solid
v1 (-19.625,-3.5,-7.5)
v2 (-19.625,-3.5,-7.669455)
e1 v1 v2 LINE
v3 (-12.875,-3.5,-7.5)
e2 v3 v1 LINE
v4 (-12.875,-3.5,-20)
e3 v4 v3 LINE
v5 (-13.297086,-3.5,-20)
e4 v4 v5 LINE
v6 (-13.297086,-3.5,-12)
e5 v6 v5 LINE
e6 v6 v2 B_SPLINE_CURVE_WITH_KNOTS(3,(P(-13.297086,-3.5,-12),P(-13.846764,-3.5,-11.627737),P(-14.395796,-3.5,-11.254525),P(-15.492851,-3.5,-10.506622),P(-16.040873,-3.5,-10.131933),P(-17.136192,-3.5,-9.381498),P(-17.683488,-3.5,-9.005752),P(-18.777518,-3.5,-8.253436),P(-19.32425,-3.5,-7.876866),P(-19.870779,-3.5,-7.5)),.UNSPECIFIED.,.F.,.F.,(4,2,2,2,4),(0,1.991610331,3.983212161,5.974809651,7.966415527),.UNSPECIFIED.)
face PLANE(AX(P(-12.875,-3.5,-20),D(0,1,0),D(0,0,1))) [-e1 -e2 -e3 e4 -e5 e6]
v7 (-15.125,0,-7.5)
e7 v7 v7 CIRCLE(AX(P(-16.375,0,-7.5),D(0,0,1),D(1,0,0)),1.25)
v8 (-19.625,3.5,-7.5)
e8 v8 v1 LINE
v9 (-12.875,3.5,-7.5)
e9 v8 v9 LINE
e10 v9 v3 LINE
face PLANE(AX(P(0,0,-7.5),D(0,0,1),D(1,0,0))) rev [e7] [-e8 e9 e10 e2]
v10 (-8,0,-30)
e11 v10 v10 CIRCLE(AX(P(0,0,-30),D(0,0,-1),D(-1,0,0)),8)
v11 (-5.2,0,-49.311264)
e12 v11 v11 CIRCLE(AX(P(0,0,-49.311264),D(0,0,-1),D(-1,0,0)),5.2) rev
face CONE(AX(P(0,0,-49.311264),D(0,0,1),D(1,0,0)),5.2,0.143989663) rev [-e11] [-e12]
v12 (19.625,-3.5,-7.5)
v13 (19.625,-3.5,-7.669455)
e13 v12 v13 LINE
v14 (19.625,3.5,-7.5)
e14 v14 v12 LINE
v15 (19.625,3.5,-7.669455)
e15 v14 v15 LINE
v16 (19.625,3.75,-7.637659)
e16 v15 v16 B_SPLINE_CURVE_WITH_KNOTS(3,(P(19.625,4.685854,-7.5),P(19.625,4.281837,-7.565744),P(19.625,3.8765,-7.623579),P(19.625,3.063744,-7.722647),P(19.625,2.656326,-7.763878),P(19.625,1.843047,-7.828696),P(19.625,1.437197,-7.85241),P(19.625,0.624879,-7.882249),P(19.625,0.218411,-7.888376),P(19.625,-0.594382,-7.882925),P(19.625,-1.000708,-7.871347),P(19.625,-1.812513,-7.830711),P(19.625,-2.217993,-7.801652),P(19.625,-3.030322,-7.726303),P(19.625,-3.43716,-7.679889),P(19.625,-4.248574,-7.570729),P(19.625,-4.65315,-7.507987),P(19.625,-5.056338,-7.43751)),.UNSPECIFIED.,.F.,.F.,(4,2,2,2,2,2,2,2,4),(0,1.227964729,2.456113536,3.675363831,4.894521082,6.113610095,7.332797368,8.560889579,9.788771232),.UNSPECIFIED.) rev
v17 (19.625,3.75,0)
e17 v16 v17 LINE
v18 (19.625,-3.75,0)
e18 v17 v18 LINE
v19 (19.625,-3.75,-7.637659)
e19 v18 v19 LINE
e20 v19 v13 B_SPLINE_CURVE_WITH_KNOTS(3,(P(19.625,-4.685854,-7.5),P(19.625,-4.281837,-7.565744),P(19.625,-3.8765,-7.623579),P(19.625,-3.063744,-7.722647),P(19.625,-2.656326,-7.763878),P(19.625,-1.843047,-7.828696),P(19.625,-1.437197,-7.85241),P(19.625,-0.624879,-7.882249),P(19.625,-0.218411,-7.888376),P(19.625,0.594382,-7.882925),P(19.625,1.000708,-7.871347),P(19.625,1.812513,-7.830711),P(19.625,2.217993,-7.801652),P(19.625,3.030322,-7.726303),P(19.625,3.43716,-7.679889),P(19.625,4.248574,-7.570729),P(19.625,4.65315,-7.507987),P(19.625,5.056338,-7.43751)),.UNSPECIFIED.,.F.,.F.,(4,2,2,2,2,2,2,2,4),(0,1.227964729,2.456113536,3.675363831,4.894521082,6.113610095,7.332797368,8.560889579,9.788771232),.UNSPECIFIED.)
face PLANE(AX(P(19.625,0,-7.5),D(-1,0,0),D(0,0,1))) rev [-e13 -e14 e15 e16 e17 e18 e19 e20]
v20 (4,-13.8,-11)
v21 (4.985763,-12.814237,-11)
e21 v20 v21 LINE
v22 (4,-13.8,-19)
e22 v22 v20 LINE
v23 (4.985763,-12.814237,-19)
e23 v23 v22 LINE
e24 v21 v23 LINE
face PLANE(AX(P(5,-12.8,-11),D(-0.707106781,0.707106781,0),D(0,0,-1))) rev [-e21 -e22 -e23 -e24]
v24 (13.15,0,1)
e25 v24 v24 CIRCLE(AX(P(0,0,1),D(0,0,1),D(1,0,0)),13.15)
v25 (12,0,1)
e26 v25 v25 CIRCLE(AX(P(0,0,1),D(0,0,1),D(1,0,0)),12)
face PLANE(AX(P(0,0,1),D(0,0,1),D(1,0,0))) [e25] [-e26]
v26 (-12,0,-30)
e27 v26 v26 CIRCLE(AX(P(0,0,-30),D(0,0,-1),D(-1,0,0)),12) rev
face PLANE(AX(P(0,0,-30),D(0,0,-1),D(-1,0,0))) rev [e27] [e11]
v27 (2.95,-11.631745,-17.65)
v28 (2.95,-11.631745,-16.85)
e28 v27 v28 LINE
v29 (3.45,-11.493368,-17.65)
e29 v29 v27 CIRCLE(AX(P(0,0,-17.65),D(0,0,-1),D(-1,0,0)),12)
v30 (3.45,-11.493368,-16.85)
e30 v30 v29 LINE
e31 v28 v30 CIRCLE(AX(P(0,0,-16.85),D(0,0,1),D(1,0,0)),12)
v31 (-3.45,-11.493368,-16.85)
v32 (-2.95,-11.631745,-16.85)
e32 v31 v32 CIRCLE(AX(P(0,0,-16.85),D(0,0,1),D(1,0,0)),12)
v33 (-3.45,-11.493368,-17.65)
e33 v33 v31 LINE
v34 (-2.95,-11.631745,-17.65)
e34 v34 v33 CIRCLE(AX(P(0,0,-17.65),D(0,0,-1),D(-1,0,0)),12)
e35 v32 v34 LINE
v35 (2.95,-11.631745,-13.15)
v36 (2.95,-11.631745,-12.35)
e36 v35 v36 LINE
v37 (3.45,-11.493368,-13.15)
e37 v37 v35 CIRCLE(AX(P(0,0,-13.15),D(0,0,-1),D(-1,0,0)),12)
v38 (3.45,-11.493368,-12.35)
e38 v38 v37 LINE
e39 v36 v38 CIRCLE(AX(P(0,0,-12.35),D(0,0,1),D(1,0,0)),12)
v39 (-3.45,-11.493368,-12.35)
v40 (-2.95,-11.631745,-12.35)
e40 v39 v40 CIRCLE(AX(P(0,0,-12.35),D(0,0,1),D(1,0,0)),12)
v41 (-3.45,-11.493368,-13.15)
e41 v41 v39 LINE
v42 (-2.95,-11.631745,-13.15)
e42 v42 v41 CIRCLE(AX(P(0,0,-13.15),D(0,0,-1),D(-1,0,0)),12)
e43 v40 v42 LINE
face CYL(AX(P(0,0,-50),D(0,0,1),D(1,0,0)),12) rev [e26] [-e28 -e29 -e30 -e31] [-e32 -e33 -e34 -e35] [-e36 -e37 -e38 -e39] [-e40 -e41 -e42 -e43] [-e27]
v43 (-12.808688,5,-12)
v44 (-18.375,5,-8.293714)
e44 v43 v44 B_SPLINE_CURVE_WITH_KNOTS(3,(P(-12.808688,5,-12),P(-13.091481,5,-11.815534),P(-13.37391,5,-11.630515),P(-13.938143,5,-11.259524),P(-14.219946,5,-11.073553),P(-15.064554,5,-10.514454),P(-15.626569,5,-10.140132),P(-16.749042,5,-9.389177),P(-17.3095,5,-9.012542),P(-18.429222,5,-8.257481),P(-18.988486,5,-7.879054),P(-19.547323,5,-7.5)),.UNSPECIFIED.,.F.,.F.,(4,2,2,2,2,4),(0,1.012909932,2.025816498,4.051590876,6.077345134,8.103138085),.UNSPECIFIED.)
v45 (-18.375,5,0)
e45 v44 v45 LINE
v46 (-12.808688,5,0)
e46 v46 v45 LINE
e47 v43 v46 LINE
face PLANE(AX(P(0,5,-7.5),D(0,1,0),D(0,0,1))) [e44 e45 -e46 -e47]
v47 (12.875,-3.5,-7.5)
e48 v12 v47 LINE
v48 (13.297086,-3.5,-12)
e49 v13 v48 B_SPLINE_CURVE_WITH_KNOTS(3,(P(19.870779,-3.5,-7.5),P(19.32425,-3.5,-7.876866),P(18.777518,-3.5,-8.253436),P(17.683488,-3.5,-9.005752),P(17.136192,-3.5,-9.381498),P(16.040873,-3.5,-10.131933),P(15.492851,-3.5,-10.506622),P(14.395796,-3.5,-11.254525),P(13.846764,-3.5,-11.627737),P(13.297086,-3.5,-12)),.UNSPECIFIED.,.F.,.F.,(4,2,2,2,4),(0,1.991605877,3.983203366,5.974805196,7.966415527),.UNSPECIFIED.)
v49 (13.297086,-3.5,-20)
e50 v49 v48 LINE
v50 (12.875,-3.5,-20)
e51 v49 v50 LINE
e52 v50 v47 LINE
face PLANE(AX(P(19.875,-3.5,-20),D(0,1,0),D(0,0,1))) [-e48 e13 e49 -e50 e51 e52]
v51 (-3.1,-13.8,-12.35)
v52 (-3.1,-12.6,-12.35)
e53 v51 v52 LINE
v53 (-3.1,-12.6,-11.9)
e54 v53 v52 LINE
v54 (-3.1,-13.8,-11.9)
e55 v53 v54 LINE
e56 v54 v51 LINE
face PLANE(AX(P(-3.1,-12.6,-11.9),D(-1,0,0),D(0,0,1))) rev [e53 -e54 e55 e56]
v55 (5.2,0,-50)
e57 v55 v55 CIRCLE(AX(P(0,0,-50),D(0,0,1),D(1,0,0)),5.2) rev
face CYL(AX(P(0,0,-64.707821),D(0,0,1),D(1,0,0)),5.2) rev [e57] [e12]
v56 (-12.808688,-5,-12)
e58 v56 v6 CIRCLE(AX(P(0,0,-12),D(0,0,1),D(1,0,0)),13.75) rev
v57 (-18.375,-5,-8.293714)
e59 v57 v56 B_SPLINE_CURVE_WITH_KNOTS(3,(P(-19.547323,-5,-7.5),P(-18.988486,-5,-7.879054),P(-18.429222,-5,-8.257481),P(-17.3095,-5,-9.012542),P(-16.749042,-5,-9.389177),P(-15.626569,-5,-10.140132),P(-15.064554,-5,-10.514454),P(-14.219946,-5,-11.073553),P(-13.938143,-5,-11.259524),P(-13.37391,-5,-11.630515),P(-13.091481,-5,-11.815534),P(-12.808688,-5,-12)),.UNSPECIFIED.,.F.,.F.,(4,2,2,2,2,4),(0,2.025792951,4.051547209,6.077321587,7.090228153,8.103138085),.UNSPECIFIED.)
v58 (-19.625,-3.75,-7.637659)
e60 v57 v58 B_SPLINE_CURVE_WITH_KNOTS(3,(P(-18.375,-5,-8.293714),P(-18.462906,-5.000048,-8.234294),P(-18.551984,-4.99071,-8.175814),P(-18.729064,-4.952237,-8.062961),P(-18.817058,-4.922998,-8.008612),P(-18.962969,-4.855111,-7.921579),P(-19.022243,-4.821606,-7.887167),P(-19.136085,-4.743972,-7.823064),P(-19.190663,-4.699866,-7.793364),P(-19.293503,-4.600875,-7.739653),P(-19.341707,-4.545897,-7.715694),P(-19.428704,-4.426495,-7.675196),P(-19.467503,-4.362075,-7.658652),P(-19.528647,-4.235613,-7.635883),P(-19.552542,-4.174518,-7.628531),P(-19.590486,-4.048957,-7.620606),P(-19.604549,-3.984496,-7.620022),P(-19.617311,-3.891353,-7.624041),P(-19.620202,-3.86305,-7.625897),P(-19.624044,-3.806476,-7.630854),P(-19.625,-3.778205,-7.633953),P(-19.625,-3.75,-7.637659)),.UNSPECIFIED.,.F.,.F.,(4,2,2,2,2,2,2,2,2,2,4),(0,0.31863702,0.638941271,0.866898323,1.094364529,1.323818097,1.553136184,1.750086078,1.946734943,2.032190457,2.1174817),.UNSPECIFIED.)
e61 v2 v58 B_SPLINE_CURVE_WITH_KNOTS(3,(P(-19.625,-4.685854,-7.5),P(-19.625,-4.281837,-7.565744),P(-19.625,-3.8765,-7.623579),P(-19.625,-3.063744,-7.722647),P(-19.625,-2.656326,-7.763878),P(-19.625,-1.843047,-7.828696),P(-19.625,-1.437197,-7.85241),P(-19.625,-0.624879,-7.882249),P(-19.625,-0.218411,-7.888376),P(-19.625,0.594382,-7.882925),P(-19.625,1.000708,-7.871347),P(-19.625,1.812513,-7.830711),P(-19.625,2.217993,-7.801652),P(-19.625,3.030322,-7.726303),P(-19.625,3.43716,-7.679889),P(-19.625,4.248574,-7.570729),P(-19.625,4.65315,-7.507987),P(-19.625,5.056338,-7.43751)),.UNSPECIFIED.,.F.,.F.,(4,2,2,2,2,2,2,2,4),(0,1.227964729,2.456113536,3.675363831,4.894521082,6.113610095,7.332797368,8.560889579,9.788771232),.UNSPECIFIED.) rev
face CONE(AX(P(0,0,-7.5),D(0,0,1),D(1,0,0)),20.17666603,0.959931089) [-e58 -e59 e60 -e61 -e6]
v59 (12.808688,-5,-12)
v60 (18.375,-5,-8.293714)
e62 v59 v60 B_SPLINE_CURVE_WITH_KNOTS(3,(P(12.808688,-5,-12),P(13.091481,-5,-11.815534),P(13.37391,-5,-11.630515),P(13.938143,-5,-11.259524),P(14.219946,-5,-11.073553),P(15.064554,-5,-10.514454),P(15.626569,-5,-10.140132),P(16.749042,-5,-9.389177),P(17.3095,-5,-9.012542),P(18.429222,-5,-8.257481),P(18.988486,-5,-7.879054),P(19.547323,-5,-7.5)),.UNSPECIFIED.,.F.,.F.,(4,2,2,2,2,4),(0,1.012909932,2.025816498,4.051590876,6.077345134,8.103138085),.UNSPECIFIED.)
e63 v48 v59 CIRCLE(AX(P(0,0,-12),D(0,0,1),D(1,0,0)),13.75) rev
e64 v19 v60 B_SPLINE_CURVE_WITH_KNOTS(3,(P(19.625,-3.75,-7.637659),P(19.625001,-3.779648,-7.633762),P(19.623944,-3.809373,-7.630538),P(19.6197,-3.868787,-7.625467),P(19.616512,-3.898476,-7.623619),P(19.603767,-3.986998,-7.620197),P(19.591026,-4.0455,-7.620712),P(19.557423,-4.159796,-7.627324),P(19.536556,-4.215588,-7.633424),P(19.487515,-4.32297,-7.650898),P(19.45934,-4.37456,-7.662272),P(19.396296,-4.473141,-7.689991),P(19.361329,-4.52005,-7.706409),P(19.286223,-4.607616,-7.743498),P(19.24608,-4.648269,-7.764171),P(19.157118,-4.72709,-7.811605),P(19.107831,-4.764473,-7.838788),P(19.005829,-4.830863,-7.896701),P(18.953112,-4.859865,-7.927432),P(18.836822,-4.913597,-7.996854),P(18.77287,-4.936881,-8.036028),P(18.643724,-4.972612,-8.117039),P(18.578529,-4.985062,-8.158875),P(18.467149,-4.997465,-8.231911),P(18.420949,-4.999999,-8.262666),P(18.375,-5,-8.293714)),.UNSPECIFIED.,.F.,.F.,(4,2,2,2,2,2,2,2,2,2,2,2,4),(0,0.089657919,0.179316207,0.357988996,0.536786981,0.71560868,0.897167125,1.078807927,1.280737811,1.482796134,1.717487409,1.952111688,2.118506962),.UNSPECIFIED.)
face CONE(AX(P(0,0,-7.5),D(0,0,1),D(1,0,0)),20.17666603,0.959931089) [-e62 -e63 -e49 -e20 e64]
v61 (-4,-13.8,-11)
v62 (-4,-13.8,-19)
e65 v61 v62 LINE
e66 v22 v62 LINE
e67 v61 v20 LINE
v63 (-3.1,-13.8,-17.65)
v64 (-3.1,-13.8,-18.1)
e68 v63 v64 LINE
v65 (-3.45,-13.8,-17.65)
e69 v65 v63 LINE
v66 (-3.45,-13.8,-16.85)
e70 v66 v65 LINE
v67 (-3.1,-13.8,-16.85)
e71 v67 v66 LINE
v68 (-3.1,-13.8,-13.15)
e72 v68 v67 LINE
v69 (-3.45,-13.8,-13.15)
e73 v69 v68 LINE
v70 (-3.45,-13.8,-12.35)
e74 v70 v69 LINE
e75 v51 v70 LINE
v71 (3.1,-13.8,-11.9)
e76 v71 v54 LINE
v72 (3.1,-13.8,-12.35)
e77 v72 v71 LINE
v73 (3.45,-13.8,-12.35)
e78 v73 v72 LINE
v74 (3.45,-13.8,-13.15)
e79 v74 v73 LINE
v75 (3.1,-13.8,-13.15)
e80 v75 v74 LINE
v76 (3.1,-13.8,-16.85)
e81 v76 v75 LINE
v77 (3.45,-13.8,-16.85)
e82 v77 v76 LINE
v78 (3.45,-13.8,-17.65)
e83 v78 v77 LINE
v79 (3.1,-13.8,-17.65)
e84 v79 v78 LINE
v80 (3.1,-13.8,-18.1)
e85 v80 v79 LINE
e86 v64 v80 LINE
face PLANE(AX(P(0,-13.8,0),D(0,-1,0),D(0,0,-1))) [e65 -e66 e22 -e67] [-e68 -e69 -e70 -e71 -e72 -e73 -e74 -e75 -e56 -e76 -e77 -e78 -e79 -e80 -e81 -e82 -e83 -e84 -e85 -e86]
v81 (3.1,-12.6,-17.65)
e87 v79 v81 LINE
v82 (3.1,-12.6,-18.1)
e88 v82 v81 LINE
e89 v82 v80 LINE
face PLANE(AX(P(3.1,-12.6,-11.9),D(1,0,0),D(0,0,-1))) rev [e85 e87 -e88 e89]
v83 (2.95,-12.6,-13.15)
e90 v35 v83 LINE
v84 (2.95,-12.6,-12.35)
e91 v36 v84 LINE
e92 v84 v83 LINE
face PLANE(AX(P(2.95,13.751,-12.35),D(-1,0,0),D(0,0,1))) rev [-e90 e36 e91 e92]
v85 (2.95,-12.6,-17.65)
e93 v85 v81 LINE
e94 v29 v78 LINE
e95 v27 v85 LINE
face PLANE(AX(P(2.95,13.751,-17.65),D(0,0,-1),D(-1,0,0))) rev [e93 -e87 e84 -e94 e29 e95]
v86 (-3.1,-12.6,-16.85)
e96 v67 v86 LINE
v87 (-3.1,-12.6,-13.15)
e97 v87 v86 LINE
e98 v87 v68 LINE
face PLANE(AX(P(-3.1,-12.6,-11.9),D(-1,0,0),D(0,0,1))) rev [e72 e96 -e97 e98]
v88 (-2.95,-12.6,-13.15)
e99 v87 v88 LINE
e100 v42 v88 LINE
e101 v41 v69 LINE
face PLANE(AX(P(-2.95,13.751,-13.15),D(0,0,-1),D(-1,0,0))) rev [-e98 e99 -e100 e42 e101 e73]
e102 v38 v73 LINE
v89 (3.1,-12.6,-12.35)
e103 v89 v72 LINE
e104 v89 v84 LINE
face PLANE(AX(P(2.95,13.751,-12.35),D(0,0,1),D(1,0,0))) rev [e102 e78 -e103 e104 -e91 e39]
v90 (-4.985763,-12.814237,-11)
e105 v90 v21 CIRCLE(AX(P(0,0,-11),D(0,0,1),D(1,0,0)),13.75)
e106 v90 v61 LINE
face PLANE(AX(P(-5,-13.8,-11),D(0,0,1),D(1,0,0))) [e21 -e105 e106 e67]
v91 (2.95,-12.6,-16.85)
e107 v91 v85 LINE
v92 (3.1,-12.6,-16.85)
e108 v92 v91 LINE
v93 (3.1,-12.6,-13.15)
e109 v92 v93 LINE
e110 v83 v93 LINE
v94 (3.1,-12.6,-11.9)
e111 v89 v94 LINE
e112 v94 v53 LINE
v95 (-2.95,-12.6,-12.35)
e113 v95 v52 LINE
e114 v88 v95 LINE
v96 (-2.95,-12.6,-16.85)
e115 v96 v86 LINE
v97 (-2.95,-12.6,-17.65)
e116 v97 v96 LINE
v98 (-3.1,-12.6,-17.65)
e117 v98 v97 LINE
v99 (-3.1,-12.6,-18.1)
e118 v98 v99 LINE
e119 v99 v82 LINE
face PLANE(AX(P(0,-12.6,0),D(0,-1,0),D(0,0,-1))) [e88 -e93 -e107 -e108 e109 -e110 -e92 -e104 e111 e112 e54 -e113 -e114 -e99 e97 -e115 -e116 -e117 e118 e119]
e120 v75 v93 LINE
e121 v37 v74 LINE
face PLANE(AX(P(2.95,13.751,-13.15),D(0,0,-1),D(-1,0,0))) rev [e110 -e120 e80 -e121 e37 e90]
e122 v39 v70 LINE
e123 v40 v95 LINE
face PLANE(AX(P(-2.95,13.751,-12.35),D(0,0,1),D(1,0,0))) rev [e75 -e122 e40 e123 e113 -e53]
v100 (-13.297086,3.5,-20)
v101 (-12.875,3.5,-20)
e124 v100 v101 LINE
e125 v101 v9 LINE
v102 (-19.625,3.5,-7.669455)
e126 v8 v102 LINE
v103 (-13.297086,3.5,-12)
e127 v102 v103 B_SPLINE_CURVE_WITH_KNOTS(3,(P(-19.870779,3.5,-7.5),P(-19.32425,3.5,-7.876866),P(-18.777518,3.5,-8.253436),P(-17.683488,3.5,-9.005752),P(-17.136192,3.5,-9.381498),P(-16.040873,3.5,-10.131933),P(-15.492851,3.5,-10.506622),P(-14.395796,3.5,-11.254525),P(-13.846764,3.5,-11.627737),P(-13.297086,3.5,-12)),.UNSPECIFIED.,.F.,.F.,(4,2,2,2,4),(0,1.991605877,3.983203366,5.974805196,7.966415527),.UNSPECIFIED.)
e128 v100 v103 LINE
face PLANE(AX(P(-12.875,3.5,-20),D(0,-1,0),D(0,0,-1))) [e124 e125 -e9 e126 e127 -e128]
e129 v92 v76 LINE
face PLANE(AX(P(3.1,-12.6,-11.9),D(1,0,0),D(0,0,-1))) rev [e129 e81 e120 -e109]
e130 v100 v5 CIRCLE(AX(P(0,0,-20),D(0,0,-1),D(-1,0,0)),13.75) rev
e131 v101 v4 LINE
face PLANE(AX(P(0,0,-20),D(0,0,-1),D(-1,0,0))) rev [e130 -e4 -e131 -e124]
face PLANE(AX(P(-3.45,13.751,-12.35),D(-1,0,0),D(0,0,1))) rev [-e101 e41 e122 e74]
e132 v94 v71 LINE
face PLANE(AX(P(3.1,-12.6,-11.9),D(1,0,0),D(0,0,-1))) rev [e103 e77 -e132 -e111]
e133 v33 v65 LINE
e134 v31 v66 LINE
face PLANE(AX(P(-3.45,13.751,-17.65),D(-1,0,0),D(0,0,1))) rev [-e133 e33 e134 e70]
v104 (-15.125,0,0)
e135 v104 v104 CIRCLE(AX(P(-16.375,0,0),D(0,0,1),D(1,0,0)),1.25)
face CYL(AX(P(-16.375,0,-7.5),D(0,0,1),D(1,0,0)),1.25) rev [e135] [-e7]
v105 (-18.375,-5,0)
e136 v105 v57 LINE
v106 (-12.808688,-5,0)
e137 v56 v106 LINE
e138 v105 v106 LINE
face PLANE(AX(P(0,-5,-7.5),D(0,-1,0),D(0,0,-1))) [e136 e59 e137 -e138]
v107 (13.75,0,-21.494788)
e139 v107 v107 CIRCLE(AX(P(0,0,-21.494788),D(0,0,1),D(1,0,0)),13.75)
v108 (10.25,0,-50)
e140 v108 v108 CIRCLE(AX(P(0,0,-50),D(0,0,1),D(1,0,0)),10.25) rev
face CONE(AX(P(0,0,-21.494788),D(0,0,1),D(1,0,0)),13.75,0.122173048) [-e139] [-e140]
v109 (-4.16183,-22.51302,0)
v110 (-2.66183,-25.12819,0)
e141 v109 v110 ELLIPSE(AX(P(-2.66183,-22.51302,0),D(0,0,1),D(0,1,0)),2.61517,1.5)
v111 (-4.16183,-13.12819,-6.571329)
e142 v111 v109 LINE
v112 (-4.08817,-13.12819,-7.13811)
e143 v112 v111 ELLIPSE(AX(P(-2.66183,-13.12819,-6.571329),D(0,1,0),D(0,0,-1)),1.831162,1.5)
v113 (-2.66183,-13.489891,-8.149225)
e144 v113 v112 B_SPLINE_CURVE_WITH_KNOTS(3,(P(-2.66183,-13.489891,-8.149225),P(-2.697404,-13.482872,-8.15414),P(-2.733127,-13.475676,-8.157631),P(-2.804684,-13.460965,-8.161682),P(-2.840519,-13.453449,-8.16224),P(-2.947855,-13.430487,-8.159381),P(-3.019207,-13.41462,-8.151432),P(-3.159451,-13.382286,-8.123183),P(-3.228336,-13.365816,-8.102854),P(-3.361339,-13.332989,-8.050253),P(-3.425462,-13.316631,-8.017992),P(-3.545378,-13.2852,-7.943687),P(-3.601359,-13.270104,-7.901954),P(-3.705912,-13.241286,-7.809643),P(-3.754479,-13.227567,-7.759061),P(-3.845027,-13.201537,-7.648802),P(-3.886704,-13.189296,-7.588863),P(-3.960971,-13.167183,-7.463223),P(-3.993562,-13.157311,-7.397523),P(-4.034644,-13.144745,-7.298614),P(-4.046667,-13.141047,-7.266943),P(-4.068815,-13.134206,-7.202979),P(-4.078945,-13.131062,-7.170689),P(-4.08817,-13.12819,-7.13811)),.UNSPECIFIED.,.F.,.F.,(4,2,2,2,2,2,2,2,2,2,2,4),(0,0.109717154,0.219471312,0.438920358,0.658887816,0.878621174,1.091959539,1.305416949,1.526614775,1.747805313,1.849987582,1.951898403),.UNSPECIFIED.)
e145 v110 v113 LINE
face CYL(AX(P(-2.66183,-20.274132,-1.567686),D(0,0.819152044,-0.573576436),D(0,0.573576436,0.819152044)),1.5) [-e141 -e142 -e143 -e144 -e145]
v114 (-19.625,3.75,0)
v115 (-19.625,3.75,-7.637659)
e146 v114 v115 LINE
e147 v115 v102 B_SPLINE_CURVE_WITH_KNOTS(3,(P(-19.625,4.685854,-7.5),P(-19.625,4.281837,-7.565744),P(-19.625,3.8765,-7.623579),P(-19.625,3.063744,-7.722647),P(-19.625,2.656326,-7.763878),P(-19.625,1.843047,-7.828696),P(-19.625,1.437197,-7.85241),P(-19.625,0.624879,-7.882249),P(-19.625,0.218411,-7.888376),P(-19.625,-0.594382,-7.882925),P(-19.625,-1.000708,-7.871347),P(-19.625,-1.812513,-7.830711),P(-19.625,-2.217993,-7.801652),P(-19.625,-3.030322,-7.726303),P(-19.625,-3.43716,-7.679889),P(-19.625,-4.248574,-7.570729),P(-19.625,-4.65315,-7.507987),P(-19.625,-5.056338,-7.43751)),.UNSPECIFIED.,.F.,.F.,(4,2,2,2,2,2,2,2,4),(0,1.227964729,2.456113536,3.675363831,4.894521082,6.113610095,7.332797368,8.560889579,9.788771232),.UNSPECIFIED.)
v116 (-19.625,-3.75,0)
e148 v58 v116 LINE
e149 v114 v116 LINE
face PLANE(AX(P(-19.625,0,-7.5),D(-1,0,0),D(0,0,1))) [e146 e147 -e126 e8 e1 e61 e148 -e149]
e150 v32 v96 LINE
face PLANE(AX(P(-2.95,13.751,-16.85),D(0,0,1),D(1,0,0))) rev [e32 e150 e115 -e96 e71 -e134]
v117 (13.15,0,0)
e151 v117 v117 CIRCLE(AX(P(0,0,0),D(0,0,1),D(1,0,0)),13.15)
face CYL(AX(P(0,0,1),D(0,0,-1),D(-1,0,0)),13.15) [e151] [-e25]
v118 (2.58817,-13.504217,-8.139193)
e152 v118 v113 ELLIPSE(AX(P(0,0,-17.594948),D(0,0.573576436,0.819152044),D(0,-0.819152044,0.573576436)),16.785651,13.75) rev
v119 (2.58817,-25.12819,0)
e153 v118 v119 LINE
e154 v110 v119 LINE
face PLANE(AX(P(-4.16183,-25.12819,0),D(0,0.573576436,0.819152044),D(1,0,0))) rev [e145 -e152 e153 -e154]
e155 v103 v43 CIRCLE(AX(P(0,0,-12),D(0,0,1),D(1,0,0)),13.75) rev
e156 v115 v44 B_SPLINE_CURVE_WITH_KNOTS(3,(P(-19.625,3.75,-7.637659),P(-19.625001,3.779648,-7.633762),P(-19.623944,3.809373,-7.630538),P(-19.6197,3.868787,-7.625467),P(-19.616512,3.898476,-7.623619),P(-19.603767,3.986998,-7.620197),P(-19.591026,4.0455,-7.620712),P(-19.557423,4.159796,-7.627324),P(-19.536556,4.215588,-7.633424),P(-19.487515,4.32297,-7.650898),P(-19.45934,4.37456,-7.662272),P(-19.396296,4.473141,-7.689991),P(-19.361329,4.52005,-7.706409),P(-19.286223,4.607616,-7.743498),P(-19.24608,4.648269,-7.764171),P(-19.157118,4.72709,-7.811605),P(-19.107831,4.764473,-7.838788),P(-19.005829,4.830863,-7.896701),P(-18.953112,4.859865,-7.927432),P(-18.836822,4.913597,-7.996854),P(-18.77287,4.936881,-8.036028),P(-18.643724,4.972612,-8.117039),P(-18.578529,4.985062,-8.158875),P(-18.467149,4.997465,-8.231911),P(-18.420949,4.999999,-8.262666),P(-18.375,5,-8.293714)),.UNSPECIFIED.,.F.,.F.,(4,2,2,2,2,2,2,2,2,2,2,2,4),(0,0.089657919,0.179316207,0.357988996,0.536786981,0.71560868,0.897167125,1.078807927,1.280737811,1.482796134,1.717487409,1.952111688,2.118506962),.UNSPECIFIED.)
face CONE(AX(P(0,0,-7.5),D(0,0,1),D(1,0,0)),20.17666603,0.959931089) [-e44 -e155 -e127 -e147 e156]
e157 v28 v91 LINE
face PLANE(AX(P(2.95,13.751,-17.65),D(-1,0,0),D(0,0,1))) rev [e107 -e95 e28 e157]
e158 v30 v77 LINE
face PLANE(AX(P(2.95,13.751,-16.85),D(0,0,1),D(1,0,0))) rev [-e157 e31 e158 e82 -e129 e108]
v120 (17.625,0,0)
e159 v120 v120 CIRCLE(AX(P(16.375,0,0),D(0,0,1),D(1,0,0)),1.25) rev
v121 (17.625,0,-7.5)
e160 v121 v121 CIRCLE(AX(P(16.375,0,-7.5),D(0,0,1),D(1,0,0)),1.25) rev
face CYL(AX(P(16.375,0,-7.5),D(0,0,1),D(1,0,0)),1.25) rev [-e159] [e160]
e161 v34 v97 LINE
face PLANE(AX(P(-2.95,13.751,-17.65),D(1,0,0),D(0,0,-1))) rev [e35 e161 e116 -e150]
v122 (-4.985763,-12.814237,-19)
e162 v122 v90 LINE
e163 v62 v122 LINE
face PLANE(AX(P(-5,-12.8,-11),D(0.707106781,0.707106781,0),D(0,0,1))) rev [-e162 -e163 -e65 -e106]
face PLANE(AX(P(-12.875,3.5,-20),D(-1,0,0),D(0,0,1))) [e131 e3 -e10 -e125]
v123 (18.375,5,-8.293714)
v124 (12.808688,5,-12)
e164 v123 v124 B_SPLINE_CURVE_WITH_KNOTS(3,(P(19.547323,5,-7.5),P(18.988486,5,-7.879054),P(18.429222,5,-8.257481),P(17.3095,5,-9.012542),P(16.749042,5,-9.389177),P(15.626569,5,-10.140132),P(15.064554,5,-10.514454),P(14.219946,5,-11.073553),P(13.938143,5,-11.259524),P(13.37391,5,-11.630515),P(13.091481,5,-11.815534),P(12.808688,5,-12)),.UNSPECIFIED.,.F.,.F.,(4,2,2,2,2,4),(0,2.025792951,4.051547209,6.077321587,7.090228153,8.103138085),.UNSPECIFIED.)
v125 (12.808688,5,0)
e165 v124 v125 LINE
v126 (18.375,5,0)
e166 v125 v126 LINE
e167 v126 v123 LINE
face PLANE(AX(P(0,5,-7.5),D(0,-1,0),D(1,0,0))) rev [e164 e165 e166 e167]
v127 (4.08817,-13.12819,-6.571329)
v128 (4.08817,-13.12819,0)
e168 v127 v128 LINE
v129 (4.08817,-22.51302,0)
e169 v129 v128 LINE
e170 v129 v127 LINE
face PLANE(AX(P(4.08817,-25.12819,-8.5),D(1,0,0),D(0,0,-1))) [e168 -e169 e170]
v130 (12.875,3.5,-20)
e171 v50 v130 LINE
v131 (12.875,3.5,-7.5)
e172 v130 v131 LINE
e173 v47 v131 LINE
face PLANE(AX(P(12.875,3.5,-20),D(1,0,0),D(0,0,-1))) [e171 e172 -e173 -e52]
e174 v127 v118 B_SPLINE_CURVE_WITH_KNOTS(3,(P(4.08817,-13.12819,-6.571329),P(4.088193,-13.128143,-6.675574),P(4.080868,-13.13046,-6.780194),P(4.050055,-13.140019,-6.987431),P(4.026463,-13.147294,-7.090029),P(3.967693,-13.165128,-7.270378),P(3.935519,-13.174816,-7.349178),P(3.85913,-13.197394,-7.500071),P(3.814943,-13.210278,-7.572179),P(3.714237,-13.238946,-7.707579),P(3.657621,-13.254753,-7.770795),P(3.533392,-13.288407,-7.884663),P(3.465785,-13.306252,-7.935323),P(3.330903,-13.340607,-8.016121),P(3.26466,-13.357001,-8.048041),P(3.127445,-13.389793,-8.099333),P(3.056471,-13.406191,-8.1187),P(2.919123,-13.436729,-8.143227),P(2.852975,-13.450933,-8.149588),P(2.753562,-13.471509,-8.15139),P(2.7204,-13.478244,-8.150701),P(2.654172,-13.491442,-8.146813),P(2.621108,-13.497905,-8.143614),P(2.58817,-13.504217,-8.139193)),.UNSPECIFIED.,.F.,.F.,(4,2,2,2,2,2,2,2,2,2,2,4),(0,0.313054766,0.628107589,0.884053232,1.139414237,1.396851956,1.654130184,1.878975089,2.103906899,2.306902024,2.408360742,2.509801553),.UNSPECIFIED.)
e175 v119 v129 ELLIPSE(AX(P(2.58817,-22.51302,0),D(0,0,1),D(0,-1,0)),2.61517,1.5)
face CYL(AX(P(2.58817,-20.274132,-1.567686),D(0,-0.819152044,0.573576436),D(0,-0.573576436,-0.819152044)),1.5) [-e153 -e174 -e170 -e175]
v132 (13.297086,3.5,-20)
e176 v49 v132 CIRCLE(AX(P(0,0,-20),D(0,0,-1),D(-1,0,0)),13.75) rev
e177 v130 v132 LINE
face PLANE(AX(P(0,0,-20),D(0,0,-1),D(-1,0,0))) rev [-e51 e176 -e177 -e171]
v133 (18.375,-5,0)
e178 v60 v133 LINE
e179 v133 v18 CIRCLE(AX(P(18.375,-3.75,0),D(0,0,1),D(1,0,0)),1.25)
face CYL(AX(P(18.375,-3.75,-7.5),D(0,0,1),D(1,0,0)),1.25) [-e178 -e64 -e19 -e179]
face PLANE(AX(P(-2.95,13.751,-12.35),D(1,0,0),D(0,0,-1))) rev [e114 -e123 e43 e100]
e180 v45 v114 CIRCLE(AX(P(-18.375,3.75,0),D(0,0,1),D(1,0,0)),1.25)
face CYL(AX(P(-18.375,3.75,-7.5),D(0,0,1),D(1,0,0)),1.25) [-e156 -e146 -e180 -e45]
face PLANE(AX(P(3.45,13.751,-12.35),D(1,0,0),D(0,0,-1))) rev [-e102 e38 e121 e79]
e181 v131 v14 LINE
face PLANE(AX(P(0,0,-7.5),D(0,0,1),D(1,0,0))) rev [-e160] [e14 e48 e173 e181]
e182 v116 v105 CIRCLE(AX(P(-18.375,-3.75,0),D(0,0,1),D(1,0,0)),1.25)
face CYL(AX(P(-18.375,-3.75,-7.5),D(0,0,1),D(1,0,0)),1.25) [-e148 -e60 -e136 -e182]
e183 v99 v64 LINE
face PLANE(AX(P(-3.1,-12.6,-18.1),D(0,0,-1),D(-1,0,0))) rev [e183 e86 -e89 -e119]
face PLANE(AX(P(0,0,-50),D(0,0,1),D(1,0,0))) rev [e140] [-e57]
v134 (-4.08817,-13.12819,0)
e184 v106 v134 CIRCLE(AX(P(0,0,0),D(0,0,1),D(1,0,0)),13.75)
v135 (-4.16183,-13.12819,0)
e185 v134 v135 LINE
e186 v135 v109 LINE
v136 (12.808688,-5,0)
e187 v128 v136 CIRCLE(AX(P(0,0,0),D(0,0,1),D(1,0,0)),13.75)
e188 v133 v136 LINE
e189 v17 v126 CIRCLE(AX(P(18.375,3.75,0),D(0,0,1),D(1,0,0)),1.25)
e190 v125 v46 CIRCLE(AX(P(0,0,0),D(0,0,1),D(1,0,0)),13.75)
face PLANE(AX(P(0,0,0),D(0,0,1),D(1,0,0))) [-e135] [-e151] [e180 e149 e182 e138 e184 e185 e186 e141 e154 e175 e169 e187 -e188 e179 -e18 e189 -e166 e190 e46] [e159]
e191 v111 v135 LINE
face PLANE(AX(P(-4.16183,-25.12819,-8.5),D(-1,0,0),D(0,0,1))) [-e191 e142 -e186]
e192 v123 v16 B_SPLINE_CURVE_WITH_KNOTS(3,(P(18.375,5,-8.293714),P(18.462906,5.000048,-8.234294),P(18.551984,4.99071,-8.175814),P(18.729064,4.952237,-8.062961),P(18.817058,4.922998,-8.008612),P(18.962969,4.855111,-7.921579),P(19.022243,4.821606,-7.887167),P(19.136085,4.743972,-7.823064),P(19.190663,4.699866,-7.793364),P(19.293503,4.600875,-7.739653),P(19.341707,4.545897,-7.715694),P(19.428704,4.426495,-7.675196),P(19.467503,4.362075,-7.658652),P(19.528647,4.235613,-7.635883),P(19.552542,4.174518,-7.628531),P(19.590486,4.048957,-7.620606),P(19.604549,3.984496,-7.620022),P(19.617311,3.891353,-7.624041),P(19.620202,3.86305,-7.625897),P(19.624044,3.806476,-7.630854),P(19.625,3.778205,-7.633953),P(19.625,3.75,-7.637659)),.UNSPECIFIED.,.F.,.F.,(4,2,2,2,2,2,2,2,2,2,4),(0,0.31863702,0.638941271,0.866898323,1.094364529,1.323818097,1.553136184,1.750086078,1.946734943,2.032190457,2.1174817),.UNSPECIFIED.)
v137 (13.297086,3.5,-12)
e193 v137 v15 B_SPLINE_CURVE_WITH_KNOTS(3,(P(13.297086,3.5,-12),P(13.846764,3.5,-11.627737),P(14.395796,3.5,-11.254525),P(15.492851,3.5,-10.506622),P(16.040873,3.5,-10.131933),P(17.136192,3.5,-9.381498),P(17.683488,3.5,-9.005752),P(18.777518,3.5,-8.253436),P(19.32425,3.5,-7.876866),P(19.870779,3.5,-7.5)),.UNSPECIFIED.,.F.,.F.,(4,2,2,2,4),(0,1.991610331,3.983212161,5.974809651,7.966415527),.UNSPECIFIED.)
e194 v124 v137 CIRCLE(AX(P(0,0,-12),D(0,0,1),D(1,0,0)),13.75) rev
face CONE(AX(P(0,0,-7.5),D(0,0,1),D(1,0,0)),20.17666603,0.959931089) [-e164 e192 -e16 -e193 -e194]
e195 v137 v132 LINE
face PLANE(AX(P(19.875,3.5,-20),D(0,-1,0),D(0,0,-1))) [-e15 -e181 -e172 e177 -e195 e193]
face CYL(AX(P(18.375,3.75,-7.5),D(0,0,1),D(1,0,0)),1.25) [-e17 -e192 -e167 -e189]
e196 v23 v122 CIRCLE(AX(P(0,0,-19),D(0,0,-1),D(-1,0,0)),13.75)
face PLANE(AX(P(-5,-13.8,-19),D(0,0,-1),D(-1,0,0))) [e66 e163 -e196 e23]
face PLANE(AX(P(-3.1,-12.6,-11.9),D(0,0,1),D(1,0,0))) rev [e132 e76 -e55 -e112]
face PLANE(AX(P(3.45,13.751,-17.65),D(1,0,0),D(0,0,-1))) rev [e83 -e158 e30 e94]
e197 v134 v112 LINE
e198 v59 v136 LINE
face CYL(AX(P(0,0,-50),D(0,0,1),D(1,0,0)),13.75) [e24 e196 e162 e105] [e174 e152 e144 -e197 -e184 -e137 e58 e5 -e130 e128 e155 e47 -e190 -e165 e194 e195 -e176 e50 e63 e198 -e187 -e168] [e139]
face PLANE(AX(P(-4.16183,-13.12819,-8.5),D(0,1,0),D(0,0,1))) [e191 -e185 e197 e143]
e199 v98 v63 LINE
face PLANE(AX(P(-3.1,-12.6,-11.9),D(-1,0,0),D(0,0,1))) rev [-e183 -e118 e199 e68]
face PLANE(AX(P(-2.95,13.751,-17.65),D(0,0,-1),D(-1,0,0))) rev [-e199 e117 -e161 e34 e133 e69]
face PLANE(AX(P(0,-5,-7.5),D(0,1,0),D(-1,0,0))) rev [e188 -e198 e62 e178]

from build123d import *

# Parameters (mm, degrees)
SKETCH1_R               = 13.75
SKETCH1_R_2             = 12
BOSS_EXTRUDE1_DEPTH     = 50
SKETCH2_R               = 1.25
BOSS_EXTRUDE2_DEPTH     = 7.5
SKETCH4_R               = 13.25
BOSS_EXTRUDE3_DEPTH     = 20
SKETCH8_R               = 5.2
CUT_EXTRUDE2_DEPTH      = 20
CHAMFER2_SIZE           = 2.8
CHAMFER2_SIZE2          = 19.311263845
BOSS_EXTRUDE4_DEPTH     = 0.991311543
SKETCH9_W               = 6.2
SKETCH9_H               = 6.2
CUT_EXTRUDE3_DEPTH      = 1.2
CUT_EXTRUDE4_REACH      = 62.367
CUT_EXTRUDE4_END_RADIUS = 12
SKETCH10_W              = 0.5
SKETCH10_H              = 0.8
BOSS_EXTRUDE5_START     = 1
SKETCH11_R              = 13.15
SKETCH11_R_2            = 12
BOSS_EXTRUDE5_DEPTH     = 1
CHAMFER4_SIZE           = 1
SKETCH12_W              = 8.25
SKETCH12_H              = 12
BOSS_EXTRUDE6_DEPTH     = 8.5
CHAMFER5_SIZE           = 8.5
CHAMFER5_SIZE_2         = 12.139258057
FILLET3_R               = 1.5
SKETCH13_W              = 7
SKETCH13_H              = 7
CUT_EXTRUDE5_DEPTH      = 12.5
CHAMFER6_SIZE           = 4.5
CHAMFER6_SIZE_2         = 6.42666603
CHAMFER3_SIZE           = 3.5
CHAMFER3_SIZE2          = 28.505212498
FILLET4_R               = 1.25


with BuildPart() as part:
    # Sketch1 → Boss-Extrude1 (new body)
    with BuildSketch(Plane.XY):
        Circle(SKETCH1_R)
        Circle(SKETCH1_R_2, mode=Mode.SUBTRACT)
    extrude(amount=-BOSS_EXTRUDE1_DEPTH)

    # Sketch2 → Boss-Extrude2 (add)
    # profile 1 of 2: a face of its own
    with BuildSketch(Plane.XY):
        with BuildLine():
            ThreePointArc((-12.808688457, -5), (-13.75, 0), (-12.808688457, 5))
            Line((-12.808688457, 5), (-19.624999957, 5))
            Line((-19.624999957, 5), (-19.624999957, -5))
            Line((-19.624999957, -5), (-12.808688457, -5))
        make_face()
        with Locations((-16.375, 0)):
            Circle(SKETCH2_R, mode=Mode.SUBTRACT)
    # profile 2 of 2: a face of its own
    with BuildSketch(Plane.XY):
        with BuildLine():
            Line((19.624999957, 5), (12.808688457, 5))
            ThreePointArc((12.808688457, 5), (13.512623104, 2.54391762), (13.75, 0))
            ThreePointArc((13.75, 0), (13.512623104, -2.54391762), (12.808688457, -5))
            Line((12.808688457, -5), (19.624999957, -5))
            Line((19.624999957, -5), (19.624999957, 5))
        make_face()
        with Locations((16.375, 0)):
            Circle(SKETCH2_R, mode=Mode.SUBTRACT)
    extrude(amount=-BOSS_EXTRUDE2_DEPTH)

    # Sketch4 → Boss-Extrude3 (add)
    with BuildSketch(Plane(origin=(0, 0, -50), x_dir=(-1, 0, 0), z_dir=(0, 0, -1))):
        Circle(SKETCH4_R)
    extrude(amount=-BOSS_EXTRUDE3_DEPTH)

    # Sketch8 → Cut-Extrude2 (cut)
    with BuildSketch(Plane.XY.offset(-30)):
        Circle(SKETCH8_R)
    extrude(amount=-CUT_EXTRUDE2_DEPTH, mode=Mode.SUBTRACT)

    # Chamfer2
    chamfer2_edges = [part.edges().sort_by_distance(p)[0] for p in [
        (-5.2, 0, -30),
    ]]
    chamfer2_side = [part.faces().sort_by_distance(p)[0] for p in [
        (-11.660588745, 0, -30),
    ]]
    chamfer(chamfer2_edges, length=CHAMFER2_SIZE, length2=CHAMFER2_SIZE2, reference=chamfer2_side[0])

    # 3DSketch3 → Boss-Extrude4 (add)
    with BuildSketch(Plane(origin=(-5, -13.8, -11), x_dir=(0.7808688094430304, 0, -0.6246950475544243), z_dir=(0, -1, 0))):
        Polygon((0, 0), (7.808688094, 6.246950476), (12.806248475, 0), (4.99756038, -6.246950476), align=None)
    extrude(amount=-BOSS_EXTRUDE4_DEPTH)

    # Sketch9 → Cut-Extrude3 (cut)
    with BuildSketch(Plane.XZ.offset(13.8)):
        with Locations((0, -15)):
            Rectangle(SKETCH9_W, SKETCH9_H)
    extrude(amount=-CUT_EXTRUDE3_DEPTH, mode=Mode.SUBTRACT)

    # Cut-Extrude4: up to this cylinder (the profile starts outside it)
    cut_extrude4_end = Plane(origin=(0, 0, -15), z_dir=(0, 0, 1)) * Cylinder(CUT_EXTRUDE4_END_RADIUS, 154.234, mode=Mode.PRIVATE)
    # Sketch10 → Cut-Extrude4 (cut, up to the surface)
    with BuildSketch(Plane.XZ.offset(13.8), mode=Mode.PRIVATE) as cut_extrude4_sk1:
        with Locations((3.2, -12.75)):
            Rectangle(SKETCH10_W, SKETCH10_H)
    cut_extrude4_tool1 = extrude(cut_extrude4_sk1.sketch, amount=-CUT_EXTRUDE4_REACH, mode=Mode.PRIVATE) - cut_extrude4_end
    add(cut_extrude4_tool1.solids().sort_by_distance((3.2, -13.8, -12.75))[0], mode=Mode.SUBTRACT)
    # Sketch10 → Cut-Extrude4 (cut, up to the surface)
    with BuildSketch(Plane.XZ.offset(13.8), mode=Mode.PRIVATE) as cut_extrude4_sk2:
        with Locations((-3.2, -12.75)):
            Rectangle(SKETCH10_W, SKETCH10_H)
    cut_extrude4_tool2 = extrude(cut_extrude4_sk2.sketch, amount=-CUT_EXTRUDE4_REACH, mode=Mode.PRIVATE) - cut_extrude4_end
    add(cut_extrude4_tool2.solids().sort_by_distance((-3.2, -13.8, -12.75))[0], mode=Mode.SUBTRACT)
    # Sketch10 → Cut-Extrude4 (cut, up to the surface)
    with BuildSketch(Plane.XZ.offset(13.8), mode=Mode.PRIVATE) as cut_extrude4_sk3:
        with Locations((3.2, -17.25)):
            Rectangle(SKETCH10_W, SKETCH10_H)
    cut_extrude4_tool3 = extrude(cut_extrude4_sk3.sketch, amount=-CUT_EXTRUDE4_REACH, mode=Mode.PRIVATE) - cut_extrude4_end
    add(cut_extrude4_tool3.solids().sort_by_distance((3.2, -13.8, -17.25))[0], mode=Mode.SUBTRACT)
    # Sketch10 → Cut-Extrude4 (cut, up to the surface)
    with BuildSketch(Plane.XZ.offset(13.8), mode=Mode.PRIVATE) as cut_extrude4_sk4:
        with Locations((-3.2, -17.25)):
            Rectangle(SKETCH10_W, SKETCH10_H)
    cut_extrude4_tool4 = extrude(cut_extrude4_sk4.sketch, amount=-CUT_EXTRUDE4_REACH, mode=Mode.PRIVATE) - cut_extrude4_end
    add(cut_extrude4_tool4.solids().sort_by_distance((-3.2, -13.8, -17.25))[0], mode=Mode.SUBTRACT)

    # Sketch11 → Boss-Extrude5 (add)
    with BuildSketch(Plane.XY.offset(BOSS_EXTRUDE5_START)):
        Circle(SKETCH11_R)
        Circle(SKETCH11_R_2, mode=Mode.SUBTRACT)
    extrude(amount=-BOSS_EXTRUDE5_DEPTH)

    # Chamfer4
    # the kernel refuses this chamfer: 1 mm, written as the material it takes off along each edge
    with BuildSketch(Plane(origin=(-5, -13.8, -21.571682988), x_dir=(0.9996219169112968, -0.027495876610585647, 0), z_dir=(0, 0, 1))) as chamfer4_piece_1_section:
        Polygon((CHAMFER4_SIZE * 0.999621916911, CHAMFER4_SIZE * 0.0274958766106), (-CHAMFER4_SIZE * 0.0274958766106, CHAMFER4_SIZE * 0.999621916911), (0, 0), align=None)
    chamfer4_piece_1 = extrude(amount=13.143365976, mode=Mode.PRIVATE)
    chamfer4_piece_1 = chamfer4_piece_1 - Plane(origin=(0, 0, -15), x_dir=(1, 0, 0), z_dir=(0, 0, 1)) * Cylinder(13.75, 31, mode=Mode.PRIVATE)
    add(chamfer4_piece_1, mode=Mode.SUBTRACT)
    with BuildSketch(Plane(origin=(5, -13.8, -8.428317012), x_dir=(0.02749587661058651, 0.9996219169112968, 0), z_dir=(0, 0, -1))) as chamfer4_piece_2_section:
        Polygon((CHAMFER4_SIZE * 0.999621916911, -CHAMFER4_SIZE * 0.0274958766106), (-CHAMFER4_SIZE * 0.0274958766106, -CHAMFER4_SIZE * 0.999621916911), (0, 0), align=None)
    chamfer4_piece_2 = extrude(amount=13.143365976, mode=Mode.PRIVATE)
    chamfer4_piece_2 = chamfer4_piece_2 - Plane(origin=(0, 0, -15), x_dir=(1, 0, 0), z_dir=(0, 0, 1)) * Cylinder(13.75, 31, mode=Mode.PRIVATE)
    add(chamfer4_piece_2, mode=Mode.SUBTRACT)

    # Sketch12 → Boss-Extrude6 (add)
    with BuildSketch(Plane.XY):
        with Locations((-0.036830357, -19.128189859)):
            Rectangle(SKETCH12_W, SKETCH12_H)
    extrude(amount=-BOSS_EXTRUDE6_DEPTH)

    # Chamfer5
    # the kernel refuses this chamfer: 12.139258057, 8.5 mm, written as the material it takes off along each edge
    with BuildSketch(Plane(origin=(-35.512098327, -25.128189859, -8.5), x_dir=(0, -0.045263737714021236, 0.9989750717851554), z_dir=(1, 0, 0))) as chamfer5_piece_1_section:
        Polygon((CHAMFER5_SIZE * 0.998975071785, -CHAMFER5_SIZE * 0.045263737714), (-CHAMFER5_SIZE_2 * 0.0452637377152, -CHAMFER5_SIZE_2 * 0.998975071811), (0, 0), align=None)
    chamfer5_piece_1 = extrude(amount=70.95053594, mode=Mode.PRIVATE)
    chamfer5_piece_1 = chamfer5_piece_1 - Plane(origin=(0, 0, -5.73810834), x_dir=(1, 0, 0), z_dir=(0, 0, 1)) * Cylinder(13.75, 191, mode=Mode.PRIVATE)
    add(chamfer5_piece_1, mode=Mode.SUBTRACT)

    # Fillet3
    fillet3_edges = [part.edges().sort_by_distance(p)[0] for p in [
        (-4.161830357, -19.128189859, -4.201245229),
        (4.088169643, -19.128189859, -4.201245229),
    ]]
    fillet(fillet3_edges, radius=FILLET3_R)

    # Sketch13 → Cut-Extrude5 (cut)
    with BuildSketch(Plane(origin=(0, 0, -7.5), x_dir=(-1, 0, 0), z_dir=(0, 0, -1))):
        with Locations((-16.375, 0)):
            Rectangle(SKETCH13_W, SKETCH13_H)
        with Locations((16.375, 0)):
            Rectangle(SKETCH13_W, SKETCH13_H)
    extrude(amount=CUT_EXTRUDE5_DEPTH, mode=Mode.SUBTRACT)

    # Chamfer6
    # the kernel refuses this chamfer: 6.42666603, 4.5 mm, written as the material it adds along each edge
    with BuildSketch(Plane(origin=(0, 0, -7.5), x_dir=(-0.008443836697967595, 0.999964350175454, 0), z_dir=(-0.999964350175454, -0.008443836697967595, 0))) as chamfer6_piece_1_section:
        Polygon((13.75, CHAMFER6_SIZE), (13.75 + CHAMFER6_SIZE_2, 0), (13.75, 0), align=None)
    chamfer6_piece_1 = revolve(axis=Axis((0, 0, -7.5), (0, 0, -1)), revolution_arc=144.897264771, mode=Mode.PRIVATE)
    chamfer6_piece_1 = split(chamfer6_piece_1, bisect_by=Plane(origin=(15.287184037, 5, -9.004359876), z_dir=(0, -1, 0)), keep=Keep.TOP, mode=Mode.PRIVATE)
    chamfer6_piece_1 = split(chamfer6_piece_1, bisect_by=Plane(origin=(19.624999957, 4.253690529, -9.004359876), z_dir=(-1, 0, 0)), keep=Keep.TOP, mode=Mode.PRIVATE)
    chamfer6_piece_1 = split(chamfer6_piece_1, bisect_by=Plane(origin=(15.287184037, 3.5, -9.004359876), z_dir=(0, 1, 0)), keep=Keep.TOP, mode=Mode.PRIVATE)
    add(chamfer6_piece_1)
    with BuildSketch(Plane(origin=(0, 0, -7.5), x_dir=(-0.008443836697967595, 0.999964350175454, 0), z_dir=(-0.999964350175454, -0.008443836697967595, 0))) as chamfer6_piece_2_section:
        Polygon((13.75, CHAMFER6_SIZE), (13.75 + CHAMFER6_SIZE_2, 0), (13.75, 0), align=None)
    chamfer6_piece_2 = revolve(axis=Axis((0, 0, -7.5), (0, 0, -1)), revolution_arc=144.897264771, mode=Mode.PRIVATE)
    chamfer6_piece_2 = split(chamfer6_piece_2, bisect_by=Plane(origin=(19.624999957, -4.253690529, -9.004359876), z_dir=(-1, 0, 0)), keep=Keep.TOP, mode=Mode.PRIVATE)
    chamfer6_piece_2 = split(chamfer6_piece_2, bisect_by=Plane(origin=(15.287184037, -3.5, -9.004359876), z_dir=(0, -1, 0)), keep=Keep.TOP, mode=Mode.PRIVATE)
    chamfer6_piece_2 = split(chamfer6_piece_2, bisect_by=Plane(origin=(15.287184037, -5, -9.004359876), z_dir=(0, 1, 0)), keep=Keep.TOP, mode=Mode.PRIVATE)
    add(chamfer6_piece_2)
    with BuildSketch(Plane(origin=(0, 0, -7.5), x_dir=(0.008443836697964339, -0.999964350175454, 0), z_dir=(0.999964350175454, 0.008443836697964339, 0))) as chamfer6_piece_3_section:
        Polygon((13.75, CHAMFER6_SIZE), (13.75 + CHAMFER6_SIZE_2, 0), (13.75, 0), align=None)
    chamfer6_piece_3 = revolve(axis=Axis((0, 0, -7.5), (0, 0, -1)), revolution_arc=144.897264771, mode=Mode.PRIVATE)
    chamfer6_piece_3 = split(chamfer6_piece_3, bisect_by=Plane(origin=(-12.906482524, -5, -11.926294402), z_dir=(0, 1, 0)), keep=Keep.TOP, mode=Mode.PRIVATE)
    chamfer6_piece_3 = split(chamfer6_piece_3, bisect_by=Plane(origin=(-19.624999957, -4.934370219, -11.926294402), z_dir=(1, 0, 0)), keep=Keep.TOP, mode=Mode.PRIVATE)
    chamfer6_piece_3 = split(chamfer6_piece_3, bisect_by=Plane(origin=(-12.906482524, -3.5, -11.926294402), z_dir=(0, -1, 0)), keep=Keep.TOP, mode=Mode.PRIVATE)
    add(chamfer6_piece_3)
    with BuildSketch(Plane(origin=(0, 0, -7.5), x_dir=(0.008443836697964339, -0.999964350175454, 0), z_dir=(0.999964350175454, 0.008443836697964339, 0))) as chamfer6_piece_4_section:
        Polygon((13.75, CHAMFER6_SIZE), (13.75 + CHAMFER6_SIZE_2, 0), (13.75, 0), align=None)
    chamfer6_piece_4 = revolve(axis=Axis((0, 0, -7.5), (0, 0, -1)), revolution_arc=144.897264771, mode=Mode.PRIVATE)
    chamfer6_piece_4 = split(chamfer6_piece_4, bisect_by=Plane(origin=(-19.624999957, 4.25463743, -11.933336397), z_dir=(1, 0, 0)), keep=Keep.TOP, mode=Mode.PRIVATE)
    chamfer6_piece_4 = split(chamfer6_piece_4, bisect_by=Plane(origin=(-13.117325859, 3.5, -11.933336397), z_dir=(0, 1, 0)), keep=Keep.TOP, mode=Mode.PRIVATE)
    chamfer6_piece_4 = split(chamfer6_piece_4, bisect_by=Plane(origin=(-13.117325859, 5, -11.933336397), z_dir=(0, -1, 0)), keep=Keep.TOP, mode=Mode.PRIVATE)
    add(chamfer6_piece_4)

    # Chamfer3
    chamfer3_edges = [part.edges().sort_by_distance(p)[0] for p in [
        (-13.75, 0, -50),
    ]]
    chamfer3_side = [part.faces().sort_by_distance(p)[0] for p in [
        (-13.36109127, 0, -50),
    ]]
    chamfer(chamfer3_edges, length=CHAMFER3_SIZE, length2=CHAMFER3_SIZE2, reference=chamfer3_side[0])

    # Fillet4
    fillet4_edges = [part.edges().sort_by_distance(p)[0] for p in [
        (-19.624999957, -5, -3.75),
        (-19.624999957, 5, -3.75),
        (19.624999957, 5, -3.75),
        (19.624999957, -5, -3.75),
    ]]
    fillet(fillet4_edges, radius=FILLET4_R)


solid = part.part
